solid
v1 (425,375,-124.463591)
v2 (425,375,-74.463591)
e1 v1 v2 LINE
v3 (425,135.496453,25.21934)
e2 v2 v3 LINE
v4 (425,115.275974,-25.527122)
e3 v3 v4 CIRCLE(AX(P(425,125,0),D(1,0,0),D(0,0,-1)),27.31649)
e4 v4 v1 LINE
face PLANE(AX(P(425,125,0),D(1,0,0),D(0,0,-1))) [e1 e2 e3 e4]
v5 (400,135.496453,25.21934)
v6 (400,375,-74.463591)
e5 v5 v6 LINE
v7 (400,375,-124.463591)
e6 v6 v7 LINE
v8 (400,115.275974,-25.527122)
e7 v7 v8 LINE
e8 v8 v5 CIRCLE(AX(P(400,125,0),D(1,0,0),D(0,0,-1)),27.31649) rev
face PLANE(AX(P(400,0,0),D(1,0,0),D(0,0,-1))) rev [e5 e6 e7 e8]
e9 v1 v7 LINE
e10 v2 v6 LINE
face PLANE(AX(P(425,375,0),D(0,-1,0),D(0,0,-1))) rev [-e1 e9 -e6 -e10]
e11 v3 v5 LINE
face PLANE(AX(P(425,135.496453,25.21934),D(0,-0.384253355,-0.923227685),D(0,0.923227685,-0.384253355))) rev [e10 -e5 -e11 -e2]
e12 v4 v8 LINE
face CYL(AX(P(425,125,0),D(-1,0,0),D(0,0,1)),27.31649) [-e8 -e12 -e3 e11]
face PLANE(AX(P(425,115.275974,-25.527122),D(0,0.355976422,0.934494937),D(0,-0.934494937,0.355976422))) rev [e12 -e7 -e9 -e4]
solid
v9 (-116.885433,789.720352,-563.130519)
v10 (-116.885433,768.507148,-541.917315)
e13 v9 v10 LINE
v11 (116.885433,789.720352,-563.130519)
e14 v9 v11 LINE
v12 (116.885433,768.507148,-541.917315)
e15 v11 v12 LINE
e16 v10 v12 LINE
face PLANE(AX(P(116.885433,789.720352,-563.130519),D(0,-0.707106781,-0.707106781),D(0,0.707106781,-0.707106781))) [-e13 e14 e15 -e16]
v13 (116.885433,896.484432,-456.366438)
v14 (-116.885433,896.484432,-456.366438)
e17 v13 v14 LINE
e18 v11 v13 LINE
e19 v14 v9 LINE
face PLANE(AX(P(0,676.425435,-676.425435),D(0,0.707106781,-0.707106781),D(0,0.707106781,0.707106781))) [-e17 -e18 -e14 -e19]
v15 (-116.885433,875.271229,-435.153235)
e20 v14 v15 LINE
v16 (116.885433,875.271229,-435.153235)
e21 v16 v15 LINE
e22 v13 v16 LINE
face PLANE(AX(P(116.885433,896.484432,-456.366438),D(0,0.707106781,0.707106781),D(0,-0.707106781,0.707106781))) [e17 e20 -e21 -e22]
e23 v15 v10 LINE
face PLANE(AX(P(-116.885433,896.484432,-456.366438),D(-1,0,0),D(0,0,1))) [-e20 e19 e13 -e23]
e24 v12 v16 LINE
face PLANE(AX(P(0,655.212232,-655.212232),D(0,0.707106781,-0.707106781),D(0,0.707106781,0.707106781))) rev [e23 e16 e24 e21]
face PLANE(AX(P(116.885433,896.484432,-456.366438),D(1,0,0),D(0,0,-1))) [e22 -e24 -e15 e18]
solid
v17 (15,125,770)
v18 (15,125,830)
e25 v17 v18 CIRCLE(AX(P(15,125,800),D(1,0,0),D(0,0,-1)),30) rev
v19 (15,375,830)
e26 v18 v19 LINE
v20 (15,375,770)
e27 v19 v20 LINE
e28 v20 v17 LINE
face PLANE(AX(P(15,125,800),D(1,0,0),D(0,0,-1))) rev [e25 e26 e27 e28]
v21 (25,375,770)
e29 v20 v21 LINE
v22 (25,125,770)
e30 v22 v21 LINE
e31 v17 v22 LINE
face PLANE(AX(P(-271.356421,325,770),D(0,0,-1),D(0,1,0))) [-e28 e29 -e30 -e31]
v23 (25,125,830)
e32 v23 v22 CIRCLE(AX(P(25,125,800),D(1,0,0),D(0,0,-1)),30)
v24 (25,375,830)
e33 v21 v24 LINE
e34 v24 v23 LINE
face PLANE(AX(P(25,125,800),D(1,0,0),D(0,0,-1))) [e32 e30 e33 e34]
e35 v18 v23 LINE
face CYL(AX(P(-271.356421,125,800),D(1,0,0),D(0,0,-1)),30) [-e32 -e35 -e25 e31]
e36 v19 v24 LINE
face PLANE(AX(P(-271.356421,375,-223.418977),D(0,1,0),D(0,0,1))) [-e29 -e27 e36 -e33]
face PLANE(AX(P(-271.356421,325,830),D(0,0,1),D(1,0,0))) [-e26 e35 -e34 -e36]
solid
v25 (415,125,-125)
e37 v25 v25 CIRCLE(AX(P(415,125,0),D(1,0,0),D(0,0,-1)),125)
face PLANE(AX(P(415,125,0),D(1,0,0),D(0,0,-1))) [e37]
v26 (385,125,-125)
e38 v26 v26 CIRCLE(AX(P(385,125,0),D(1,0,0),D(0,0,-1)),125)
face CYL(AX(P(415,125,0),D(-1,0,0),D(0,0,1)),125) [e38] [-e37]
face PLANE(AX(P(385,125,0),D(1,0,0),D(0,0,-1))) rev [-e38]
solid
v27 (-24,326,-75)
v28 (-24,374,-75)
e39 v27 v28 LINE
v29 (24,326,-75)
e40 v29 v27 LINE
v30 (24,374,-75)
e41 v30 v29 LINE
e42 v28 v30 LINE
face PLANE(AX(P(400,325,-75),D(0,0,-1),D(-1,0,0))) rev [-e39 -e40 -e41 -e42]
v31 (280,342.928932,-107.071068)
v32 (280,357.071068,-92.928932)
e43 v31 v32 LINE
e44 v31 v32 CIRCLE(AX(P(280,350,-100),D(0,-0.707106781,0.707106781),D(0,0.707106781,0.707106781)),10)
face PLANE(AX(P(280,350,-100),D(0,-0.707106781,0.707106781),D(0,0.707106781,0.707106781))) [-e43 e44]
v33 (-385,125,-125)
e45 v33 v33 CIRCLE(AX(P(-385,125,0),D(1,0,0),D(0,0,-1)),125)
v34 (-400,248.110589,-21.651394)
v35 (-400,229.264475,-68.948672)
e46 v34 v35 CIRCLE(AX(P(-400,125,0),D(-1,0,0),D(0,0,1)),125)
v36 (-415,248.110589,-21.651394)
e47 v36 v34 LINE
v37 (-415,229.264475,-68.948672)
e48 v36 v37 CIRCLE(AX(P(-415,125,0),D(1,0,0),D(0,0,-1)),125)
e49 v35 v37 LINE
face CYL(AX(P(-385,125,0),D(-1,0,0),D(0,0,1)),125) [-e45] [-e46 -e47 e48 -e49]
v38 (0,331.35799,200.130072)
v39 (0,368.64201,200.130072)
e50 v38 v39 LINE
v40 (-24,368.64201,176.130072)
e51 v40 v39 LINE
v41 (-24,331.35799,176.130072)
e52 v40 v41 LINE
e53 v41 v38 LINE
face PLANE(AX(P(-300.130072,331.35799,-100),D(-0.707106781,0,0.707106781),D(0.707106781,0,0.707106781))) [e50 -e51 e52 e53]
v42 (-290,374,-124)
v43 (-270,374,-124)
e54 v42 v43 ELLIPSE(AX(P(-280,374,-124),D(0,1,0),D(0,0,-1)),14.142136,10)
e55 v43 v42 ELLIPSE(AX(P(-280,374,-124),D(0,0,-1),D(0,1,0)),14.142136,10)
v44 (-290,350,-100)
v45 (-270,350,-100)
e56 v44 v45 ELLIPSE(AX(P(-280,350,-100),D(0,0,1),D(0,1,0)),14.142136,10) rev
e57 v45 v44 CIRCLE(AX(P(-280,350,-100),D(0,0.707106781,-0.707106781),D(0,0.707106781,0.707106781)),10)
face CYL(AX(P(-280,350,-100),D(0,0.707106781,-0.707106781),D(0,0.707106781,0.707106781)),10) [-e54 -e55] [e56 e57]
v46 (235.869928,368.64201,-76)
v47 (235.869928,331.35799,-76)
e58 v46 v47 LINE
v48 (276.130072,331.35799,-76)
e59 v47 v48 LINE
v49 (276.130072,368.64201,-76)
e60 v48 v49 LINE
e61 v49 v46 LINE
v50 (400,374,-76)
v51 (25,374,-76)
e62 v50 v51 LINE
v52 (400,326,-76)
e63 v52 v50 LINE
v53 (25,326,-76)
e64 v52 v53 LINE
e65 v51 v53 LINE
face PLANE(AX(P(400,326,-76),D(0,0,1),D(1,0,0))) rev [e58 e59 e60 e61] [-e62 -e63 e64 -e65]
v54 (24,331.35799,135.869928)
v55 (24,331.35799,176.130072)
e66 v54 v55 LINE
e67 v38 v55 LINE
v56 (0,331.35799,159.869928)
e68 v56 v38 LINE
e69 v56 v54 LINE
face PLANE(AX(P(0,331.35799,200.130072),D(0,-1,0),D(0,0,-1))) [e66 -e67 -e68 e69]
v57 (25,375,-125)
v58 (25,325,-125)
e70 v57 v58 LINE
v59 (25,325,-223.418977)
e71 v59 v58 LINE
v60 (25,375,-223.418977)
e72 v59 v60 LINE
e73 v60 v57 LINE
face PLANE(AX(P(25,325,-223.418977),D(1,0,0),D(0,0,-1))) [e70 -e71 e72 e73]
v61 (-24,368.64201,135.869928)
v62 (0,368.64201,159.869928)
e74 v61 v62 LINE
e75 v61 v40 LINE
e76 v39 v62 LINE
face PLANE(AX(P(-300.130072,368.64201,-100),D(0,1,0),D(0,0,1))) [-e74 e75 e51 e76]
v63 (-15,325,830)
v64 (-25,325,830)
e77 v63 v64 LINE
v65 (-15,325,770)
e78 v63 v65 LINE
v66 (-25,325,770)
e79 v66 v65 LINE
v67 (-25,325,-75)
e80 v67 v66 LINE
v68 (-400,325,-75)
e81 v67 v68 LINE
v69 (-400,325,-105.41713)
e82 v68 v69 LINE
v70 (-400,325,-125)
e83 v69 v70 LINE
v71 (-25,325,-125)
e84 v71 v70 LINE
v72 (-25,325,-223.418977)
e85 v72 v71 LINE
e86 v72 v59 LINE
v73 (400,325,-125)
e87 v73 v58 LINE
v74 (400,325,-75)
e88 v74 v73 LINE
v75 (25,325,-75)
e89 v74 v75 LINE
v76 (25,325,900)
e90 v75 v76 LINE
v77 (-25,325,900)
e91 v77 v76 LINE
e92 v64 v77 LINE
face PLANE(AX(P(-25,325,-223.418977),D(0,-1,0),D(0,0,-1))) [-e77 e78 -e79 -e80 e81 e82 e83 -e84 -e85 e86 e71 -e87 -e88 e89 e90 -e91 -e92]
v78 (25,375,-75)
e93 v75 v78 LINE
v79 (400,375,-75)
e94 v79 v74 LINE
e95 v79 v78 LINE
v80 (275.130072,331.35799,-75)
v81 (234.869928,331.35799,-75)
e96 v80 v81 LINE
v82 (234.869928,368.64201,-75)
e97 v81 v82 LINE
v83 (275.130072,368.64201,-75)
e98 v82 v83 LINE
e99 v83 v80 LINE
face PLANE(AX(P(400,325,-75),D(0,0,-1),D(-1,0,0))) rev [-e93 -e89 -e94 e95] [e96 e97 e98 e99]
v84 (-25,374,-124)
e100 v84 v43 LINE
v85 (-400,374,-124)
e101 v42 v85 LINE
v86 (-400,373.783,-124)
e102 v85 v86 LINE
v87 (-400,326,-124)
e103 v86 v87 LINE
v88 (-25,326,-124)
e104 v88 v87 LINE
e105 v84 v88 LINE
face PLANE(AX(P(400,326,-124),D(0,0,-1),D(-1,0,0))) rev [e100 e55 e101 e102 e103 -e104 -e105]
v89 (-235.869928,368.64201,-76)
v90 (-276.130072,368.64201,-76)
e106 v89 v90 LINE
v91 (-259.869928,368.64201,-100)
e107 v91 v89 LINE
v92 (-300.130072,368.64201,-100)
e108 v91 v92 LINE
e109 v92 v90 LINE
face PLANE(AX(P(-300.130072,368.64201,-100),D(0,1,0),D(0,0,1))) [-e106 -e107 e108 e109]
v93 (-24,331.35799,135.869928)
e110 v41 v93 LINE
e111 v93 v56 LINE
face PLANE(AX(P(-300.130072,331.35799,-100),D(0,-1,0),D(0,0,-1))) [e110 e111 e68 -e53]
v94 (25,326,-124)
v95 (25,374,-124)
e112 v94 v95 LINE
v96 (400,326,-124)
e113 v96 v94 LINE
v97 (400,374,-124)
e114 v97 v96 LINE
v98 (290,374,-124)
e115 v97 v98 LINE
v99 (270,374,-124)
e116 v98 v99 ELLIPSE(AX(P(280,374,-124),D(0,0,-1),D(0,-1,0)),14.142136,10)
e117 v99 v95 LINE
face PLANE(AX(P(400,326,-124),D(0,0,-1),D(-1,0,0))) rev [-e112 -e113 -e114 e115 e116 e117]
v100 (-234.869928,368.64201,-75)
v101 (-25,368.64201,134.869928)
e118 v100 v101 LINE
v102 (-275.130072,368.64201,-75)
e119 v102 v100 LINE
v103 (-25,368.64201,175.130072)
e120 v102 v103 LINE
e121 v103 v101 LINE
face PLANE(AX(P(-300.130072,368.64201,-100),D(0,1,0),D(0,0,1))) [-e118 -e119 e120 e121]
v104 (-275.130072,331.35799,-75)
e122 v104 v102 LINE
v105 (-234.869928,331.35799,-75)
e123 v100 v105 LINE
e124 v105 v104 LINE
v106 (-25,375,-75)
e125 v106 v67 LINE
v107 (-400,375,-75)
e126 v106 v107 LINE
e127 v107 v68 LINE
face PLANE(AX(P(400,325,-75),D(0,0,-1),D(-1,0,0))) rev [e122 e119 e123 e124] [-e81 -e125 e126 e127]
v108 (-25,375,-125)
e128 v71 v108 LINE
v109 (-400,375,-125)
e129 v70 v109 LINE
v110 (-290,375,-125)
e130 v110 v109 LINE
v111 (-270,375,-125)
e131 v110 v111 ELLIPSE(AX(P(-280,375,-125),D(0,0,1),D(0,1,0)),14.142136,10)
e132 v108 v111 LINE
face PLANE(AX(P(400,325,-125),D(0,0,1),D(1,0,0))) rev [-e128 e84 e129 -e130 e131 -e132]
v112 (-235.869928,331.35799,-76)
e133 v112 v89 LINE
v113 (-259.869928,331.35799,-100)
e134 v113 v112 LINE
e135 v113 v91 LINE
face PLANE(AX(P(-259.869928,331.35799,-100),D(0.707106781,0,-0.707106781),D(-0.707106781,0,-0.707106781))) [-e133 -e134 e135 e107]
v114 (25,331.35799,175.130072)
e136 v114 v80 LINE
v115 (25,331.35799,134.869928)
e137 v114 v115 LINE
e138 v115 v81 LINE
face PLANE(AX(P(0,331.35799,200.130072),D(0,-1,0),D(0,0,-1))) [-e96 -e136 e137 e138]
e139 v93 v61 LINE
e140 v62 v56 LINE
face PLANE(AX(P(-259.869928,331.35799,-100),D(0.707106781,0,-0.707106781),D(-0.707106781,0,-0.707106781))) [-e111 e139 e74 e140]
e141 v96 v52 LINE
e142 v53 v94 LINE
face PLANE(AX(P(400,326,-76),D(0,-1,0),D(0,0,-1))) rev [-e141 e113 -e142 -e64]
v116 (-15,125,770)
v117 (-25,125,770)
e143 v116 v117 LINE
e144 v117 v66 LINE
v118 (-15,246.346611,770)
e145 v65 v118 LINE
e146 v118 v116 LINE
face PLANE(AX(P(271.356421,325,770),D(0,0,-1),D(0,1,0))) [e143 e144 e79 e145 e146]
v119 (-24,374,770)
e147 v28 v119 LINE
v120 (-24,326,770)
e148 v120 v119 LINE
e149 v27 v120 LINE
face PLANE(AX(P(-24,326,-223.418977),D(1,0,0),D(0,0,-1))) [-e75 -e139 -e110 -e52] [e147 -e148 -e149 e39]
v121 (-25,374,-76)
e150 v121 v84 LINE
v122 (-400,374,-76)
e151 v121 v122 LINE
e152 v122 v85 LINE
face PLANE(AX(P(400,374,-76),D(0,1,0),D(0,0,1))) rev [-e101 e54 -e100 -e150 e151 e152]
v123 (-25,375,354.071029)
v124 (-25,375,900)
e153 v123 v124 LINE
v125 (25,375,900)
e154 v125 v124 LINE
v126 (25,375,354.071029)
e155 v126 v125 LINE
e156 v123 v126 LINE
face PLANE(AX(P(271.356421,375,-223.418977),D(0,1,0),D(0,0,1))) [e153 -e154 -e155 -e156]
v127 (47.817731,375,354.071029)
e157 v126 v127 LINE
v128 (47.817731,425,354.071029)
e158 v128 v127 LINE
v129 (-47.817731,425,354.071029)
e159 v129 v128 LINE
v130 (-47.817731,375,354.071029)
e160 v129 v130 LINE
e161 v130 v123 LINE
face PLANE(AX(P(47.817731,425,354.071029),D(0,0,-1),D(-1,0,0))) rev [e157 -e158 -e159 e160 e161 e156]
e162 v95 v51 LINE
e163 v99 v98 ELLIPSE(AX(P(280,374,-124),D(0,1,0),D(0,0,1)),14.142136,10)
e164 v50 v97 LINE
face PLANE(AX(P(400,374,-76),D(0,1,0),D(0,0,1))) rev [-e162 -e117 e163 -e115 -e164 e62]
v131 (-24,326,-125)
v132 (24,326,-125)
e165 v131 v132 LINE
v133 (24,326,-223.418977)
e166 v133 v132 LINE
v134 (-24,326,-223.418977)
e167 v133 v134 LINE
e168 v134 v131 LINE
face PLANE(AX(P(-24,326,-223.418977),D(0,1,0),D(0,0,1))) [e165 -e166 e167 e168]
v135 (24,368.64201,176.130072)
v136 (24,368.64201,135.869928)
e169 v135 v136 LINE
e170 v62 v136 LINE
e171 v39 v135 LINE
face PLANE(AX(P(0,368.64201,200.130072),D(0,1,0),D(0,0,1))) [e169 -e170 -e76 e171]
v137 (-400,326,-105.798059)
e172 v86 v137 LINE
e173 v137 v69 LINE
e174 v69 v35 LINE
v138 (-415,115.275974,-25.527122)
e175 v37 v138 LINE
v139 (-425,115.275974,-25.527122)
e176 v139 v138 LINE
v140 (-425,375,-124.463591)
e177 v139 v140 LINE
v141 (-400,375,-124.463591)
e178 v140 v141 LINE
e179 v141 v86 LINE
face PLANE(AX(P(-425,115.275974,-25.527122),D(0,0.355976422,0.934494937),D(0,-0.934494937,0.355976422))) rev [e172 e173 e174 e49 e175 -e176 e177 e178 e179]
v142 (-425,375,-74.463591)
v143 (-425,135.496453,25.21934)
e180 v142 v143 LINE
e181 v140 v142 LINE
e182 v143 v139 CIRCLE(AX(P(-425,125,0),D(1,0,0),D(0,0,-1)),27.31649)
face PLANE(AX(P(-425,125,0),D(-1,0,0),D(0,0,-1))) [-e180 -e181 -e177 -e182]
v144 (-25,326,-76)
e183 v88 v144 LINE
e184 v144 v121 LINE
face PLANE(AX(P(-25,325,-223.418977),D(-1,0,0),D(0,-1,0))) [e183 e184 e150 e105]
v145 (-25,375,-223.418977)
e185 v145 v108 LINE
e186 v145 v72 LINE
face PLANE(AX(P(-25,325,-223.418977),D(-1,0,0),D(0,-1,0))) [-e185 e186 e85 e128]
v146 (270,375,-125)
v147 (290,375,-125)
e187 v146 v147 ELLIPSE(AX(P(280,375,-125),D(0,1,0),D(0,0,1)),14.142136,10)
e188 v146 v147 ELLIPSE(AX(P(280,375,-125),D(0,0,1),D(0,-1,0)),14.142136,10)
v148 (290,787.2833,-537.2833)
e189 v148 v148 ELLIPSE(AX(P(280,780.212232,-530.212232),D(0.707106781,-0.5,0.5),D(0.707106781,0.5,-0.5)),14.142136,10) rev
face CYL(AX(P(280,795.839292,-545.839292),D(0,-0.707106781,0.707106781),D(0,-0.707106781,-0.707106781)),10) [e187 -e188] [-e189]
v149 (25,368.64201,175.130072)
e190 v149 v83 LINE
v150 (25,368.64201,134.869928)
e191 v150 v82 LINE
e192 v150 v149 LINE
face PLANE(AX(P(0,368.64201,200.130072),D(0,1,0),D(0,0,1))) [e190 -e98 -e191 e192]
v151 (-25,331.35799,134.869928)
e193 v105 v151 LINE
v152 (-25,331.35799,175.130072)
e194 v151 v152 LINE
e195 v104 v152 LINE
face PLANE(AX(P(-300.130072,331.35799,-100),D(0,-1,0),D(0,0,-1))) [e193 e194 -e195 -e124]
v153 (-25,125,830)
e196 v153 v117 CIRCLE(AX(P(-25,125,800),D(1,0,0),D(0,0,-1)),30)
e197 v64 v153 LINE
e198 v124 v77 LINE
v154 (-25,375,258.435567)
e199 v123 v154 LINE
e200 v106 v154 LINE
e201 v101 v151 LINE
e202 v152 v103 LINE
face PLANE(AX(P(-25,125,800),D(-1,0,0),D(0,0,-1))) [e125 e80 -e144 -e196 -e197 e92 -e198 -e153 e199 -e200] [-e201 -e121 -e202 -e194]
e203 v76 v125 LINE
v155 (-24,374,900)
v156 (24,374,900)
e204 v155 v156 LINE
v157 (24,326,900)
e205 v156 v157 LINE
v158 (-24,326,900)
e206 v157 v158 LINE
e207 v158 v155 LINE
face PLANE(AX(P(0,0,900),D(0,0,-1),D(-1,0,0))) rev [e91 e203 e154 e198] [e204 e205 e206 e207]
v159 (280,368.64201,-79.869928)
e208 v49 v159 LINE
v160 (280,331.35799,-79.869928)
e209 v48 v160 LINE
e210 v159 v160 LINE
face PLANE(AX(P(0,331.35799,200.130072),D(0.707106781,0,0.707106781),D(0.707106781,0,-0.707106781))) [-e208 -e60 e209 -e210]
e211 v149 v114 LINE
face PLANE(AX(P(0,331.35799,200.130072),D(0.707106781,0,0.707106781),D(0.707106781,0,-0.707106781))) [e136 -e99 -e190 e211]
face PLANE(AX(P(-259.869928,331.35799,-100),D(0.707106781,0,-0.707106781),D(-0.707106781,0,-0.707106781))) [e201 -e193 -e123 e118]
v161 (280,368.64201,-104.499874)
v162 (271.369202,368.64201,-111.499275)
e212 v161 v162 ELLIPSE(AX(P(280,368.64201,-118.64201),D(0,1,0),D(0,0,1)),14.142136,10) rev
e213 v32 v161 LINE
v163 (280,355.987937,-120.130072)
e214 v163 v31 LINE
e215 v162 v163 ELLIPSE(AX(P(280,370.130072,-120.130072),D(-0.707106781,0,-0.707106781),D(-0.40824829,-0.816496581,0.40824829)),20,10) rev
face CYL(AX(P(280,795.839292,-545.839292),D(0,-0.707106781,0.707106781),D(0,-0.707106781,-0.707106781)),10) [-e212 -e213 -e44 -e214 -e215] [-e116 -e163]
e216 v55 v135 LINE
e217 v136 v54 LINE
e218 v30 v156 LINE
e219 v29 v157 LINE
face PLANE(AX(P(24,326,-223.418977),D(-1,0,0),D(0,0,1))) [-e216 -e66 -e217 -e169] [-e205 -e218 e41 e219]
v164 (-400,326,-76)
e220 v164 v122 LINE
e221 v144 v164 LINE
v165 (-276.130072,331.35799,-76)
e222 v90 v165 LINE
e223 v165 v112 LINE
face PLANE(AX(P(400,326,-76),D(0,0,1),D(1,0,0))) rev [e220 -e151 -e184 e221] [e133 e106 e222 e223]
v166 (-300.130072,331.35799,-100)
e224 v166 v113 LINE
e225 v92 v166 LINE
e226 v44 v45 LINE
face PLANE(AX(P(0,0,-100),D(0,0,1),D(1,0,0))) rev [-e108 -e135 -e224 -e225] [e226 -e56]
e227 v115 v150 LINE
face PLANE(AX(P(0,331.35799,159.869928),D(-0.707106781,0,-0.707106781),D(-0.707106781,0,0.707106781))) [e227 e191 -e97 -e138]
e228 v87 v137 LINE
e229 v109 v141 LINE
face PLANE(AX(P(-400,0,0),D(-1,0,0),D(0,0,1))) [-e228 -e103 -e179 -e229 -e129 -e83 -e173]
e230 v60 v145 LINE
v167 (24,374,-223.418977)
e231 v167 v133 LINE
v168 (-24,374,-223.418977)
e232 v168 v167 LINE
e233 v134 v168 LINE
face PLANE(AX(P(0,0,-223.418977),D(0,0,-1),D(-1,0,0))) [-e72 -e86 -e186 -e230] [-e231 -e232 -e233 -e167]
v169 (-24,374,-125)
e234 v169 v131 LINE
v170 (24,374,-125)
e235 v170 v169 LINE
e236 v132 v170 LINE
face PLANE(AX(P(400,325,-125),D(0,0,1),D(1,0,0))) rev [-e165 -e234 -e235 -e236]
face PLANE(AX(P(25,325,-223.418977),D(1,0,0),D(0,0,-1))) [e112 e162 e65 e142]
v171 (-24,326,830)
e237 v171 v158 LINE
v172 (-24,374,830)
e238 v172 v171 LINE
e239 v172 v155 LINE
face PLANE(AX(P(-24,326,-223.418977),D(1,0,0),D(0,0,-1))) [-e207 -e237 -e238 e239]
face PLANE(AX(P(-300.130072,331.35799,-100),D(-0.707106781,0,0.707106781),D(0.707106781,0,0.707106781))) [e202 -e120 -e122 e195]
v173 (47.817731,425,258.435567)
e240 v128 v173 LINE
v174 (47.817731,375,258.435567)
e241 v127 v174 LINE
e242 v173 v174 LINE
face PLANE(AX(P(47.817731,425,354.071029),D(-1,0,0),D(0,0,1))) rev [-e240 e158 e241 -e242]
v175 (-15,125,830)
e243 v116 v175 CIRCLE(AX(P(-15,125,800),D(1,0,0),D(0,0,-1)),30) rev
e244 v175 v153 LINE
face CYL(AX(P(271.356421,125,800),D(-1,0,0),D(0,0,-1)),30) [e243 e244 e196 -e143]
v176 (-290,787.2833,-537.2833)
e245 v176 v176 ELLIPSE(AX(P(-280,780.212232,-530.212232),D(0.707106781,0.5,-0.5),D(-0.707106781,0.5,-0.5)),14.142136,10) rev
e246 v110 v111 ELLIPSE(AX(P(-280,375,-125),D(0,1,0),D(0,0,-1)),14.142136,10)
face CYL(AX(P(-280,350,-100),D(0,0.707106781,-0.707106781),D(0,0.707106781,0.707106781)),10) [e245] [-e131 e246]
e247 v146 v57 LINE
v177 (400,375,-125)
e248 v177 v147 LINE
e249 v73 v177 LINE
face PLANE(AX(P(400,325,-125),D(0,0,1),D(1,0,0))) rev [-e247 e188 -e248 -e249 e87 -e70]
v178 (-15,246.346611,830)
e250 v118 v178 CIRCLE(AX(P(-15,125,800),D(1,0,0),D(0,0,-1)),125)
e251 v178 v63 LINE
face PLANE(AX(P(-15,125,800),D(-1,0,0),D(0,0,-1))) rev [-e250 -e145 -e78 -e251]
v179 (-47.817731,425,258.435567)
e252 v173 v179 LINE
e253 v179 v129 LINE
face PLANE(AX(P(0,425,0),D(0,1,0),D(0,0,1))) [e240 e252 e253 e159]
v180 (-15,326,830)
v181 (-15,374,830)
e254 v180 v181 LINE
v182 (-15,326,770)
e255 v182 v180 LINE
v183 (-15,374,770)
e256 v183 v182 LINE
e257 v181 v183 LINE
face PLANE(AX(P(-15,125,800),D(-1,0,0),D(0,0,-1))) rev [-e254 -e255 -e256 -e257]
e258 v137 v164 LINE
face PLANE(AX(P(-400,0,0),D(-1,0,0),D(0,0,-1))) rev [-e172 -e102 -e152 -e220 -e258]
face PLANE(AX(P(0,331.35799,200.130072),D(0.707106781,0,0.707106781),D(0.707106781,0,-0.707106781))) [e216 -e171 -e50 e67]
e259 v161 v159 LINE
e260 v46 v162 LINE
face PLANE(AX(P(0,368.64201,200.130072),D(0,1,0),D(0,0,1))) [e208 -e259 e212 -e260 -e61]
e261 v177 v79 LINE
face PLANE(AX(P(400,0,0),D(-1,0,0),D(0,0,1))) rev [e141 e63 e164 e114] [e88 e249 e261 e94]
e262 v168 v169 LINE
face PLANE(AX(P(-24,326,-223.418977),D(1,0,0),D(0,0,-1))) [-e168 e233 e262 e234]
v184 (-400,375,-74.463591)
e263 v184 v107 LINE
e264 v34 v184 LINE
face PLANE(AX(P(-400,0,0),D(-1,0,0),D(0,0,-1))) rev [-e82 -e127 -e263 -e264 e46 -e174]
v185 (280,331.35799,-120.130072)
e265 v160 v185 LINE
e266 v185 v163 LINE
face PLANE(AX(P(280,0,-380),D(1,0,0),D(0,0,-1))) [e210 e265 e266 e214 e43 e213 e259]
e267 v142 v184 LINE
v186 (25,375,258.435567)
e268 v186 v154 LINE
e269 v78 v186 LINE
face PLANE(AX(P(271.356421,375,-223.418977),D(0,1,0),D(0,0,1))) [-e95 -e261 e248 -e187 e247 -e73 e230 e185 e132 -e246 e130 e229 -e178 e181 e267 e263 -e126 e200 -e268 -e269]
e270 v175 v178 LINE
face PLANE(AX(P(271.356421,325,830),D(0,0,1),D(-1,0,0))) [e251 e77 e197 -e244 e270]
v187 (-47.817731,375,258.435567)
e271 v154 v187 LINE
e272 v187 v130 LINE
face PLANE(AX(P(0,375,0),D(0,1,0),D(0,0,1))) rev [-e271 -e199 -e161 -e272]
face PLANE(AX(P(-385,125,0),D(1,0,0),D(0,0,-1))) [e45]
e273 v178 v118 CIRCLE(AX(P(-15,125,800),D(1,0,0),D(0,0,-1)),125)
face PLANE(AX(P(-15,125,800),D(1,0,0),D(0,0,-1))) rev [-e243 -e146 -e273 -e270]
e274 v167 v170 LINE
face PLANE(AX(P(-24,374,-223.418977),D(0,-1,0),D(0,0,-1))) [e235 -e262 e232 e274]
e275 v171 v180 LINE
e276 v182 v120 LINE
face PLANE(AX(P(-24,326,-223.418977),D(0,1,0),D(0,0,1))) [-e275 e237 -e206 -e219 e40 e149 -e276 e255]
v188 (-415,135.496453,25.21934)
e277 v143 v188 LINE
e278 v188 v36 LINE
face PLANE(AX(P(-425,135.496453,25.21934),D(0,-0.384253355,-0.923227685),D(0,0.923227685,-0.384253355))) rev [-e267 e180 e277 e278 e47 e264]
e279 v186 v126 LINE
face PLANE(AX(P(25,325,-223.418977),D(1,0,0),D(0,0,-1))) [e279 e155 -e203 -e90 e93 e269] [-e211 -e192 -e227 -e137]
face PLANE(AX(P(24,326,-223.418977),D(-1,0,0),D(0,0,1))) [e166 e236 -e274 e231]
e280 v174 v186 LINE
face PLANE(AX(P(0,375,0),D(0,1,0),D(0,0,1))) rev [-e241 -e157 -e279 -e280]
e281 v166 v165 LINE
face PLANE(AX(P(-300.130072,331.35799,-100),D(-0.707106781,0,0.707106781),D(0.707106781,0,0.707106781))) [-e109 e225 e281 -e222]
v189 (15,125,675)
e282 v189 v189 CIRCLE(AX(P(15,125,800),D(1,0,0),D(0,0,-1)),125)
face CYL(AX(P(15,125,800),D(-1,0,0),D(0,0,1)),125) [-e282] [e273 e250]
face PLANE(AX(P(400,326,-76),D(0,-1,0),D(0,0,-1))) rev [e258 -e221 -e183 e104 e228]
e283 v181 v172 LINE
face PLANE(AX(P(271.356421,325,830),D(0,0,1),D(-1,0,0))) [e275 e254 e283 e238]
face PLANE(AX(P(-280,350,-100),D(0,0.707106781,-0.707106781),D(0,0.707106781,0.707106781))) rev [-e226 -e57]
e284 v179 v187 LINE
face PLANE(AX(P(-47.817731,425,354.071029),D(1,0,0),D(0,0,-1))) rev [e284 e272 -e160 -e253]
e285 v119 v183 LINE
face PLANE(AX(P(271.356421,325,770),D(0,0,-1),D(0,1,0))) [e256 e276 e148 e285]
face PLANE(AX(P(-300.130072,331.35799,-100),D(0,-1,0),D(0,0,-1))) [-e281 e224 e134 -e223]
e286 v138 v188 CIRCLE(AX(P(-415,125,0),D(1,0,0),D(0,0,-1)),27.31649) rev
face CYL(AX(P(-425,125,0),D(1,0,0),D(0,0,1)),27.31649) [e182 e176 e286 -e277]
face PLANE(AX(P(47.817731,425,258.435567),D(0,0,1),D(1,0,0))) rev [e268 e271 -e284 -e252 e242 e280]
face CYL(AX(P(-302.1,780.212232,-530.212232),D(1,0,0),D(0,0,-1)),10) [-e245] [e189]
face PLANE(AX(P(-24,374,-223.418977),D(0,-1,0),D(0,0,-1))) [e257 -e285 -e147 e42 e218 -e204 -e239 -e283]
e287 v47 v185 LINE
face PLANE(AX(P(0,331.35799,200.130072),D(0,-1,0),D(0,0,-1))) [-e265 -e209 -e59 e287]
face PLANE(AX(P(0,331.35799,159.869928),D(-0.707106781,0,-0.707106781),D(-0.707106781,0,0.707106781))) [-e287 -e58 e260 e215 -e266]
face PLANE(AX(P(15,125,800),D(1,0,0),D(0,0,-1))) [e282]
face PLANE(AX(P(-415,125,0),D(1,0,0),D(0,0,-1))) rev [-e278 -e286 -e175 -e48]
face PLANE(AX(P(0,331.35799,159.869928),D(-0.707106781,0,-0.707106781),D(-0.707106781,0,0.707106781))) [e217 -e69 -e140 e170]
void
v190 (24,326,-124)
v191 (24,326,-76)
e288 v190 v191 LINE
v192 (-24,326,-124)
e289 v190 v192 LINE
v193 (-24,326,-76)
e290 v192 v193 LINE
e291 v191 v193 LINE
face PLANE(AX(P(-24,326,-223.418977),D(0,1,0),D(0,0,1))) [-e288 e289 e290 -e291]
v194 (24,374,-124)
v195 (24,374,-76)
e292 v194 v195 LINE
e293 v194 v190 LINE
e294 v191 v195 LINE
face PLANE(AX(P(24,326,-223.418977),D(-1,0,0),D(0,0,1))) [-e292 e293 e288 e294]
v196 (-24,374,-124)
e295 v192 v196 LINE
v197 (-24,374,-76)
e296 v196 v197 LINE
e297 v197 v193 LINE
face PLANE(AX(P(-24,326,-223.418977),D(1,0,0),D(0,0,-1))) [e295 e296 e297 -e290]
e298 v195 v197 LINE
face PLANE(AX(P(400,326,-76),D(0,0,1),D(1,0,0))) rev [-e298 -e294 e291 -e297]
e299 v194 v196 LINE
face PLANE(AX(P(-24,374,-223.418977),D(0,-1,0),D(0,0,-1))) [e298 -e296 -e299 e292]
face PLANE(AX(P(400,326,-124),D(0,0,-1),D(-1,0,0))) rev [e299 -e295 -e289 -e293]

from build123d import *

# Parameters (mm, degrees)
FWD_AFT_BEAM_XS_W         = 50
FWD_AFT_BEAM_XS_H         = 50
FWD_AFT_BEAM_XS_W_2       = 48
FWD_AFT_BEAM_XS_H_2       = 48
LAT_BEAM_XS_W             = 50
LAT_BEAM_XS_H             = 50
LAT_BEAM_XS_W_2           = 48
LAT_BEAM_XS_H_2           = 48
FRONT_WHEEL_SKETCH_R      = 125
BOSS_EXTRUDE1_DEPTH       = 15
REAR_RIGHT_WHEEL_SKETCH_R = 125
BOSS_EXTRUDE2_DEPTH       = 15
REAR_LEFT_WHEEL_SKETCH_R  = 125
BOSS_EXTRUDE3_DEPTH       = 15
SWEEP1_PROFILE_R          = 10
SKETCH14_W                = 40.260144978
SKETCH14_H                = 37.28401926
BOSS_EXTRUDE4_START       = 25
BOSS_EXTRUDE4_DEPTH       = 10
BOSS_EXTRUDE5_START       = 400
BOSS_EXTRUDE5_DEPTH       = 25
SKETCH17_W                = 233.770866628
SKETCH17_H                = 150.987210946
BOSS_EXTRUDE6_DEPTH       = 30
SKETCH20_W                = 95.63546101
SKETCH20_H                = 95.635461009
BOSS_EXTRUDE7_DEPTH       = 50


# Read off the part's stored shape, not the designer's step: Boss-Extrude5
with BuildPart() as part:
    # fwd-aft-beam: sweep along a path in fwd-aft-beam-profile
    with BuildLine(Plane(origin=(0, 350, -250), x_dir=(1, 0, 0), z_dir=(0, -1, 0))) as fwd_aft_beam_path:
        Line((0, 1150), (0, 26.58102252))
    # fwd-aft-beam-xs → fwd-aft-beam (sweep)
    with BuildSketch(Plane.XY):
        with Locations((0, 350)):
            Rectangle(FWD_AFT_BEAM_XS_W, FWD_AFT_BEAM_XS_H)
        with Locations((0, 350)):
            Rectangle(FWD_AFT_BEAM_XS_W_2, FWD_AFT_BEAM_XS_H_2, mode=Mode.SUBTRACT)
    sweep(path=fwd_aft_beam_path.line)

    # lat-beam: sweep along a path in lat-beam-profile
    with BuildLine(Plane(origin=(0, 350, 0), x_dir=(1, 0, 0), z_dir=(0, 1, 0))) as lat_beam_path:
        Line((-400, 100), (400, 100))
    # lat-beam-xs → lat-beam (sweep)
    with BuildSketch(Plane(origin=(0, 0, 0), x_dir=(0, 0, -1), z_dir=(1, 0, 0))):
        with Locations((100, 350)):
            Rectangle(LAT_BEAM_XS_W, LAT_BEAM_XS_H)
        with Locations((100, 350)):
            Rectangle(LAT_BEAM_XS_W_2, LAT_BEAM_XS_H_2, mode=Mode.SUBTRACT)
    sweep(path=lat_beam_path.line)

    # Sweep1: sweep along a path in Sketch1
    with BuildLine(Plane(origin=(0, 125, 125), x_dir=(1, 0, 0), z_dir=(0, 0.7071067811865488, 0.7071067811865464))) as sweep1_path:
        Line((-280, 318.198051534), (-280, 926.610024364))
        Line((-280, 926.610024364), (280, 926.610024364))
        Line((280, 926.610024364), (280, 318.198051534))
    # Sweep1 profile (on start of the path) → Sweep1 (sweep)
    with BuildSketch(Plane(origin=(-280, 350, -100), x_dir=(0, -0.7071067811865488, -0.7071067811865464), z_dir=(0, 0.7071067811865464, -0.7071067811865488))):
        Circle(SWEEP1_PROFILE_R)
    sweep(path=sweep1_path.line, transition=Transition.RIGHT)

    # Sweep2: sweep along a path in frame-sketch
    with BuildLine(Plane(origin=(0, 350, 0), x_dir=(1, 0, 0), z_dir=(0, 1, 0))) as sweep2_path:
        Line((280, 100), (0, -180))
        Line((0, -180), (-280, 100))
    # Sketch14 → Sweep2 (sweep)
    with BuildSketch(Plane.XY.offset(-100)):
        with Locations((-280, 350)):
            Rectangle(SKETCH14_W, SKETCH14_H)
    sweep(path=sweep2_path.line, transition=Transition.RIGHT)


with BuildPart() as body_2:
    # front-wheel-sketch → Boss-Extrude1 (new, symmetric)
    with BuildSketch(Plane(origin=(0, 0, 0), x_dir=(0, 0, -1), z_dir=(1, 0, 0))):
        with Locations((-800, 125)):
            Circle(FRONT_WHEEL_SKETCH_R)
    extrude(amount=BOSS_EXTRUDE1_DEPTH, both=True)


with BuildPart() as body_3:
    # rear-right-wheel-sketch → Boss-Extrude2 (new, symmetric)
    with BuildSketch(Plane(origin=(-400, 0, 0), x_dir=(0, 0, -1), z_dir=(1, 0, 0))):
        with Locations((0, 125)):
            Circle(REAR_RIGHT_WHEEL_SKETCH_R)
    extrude(amount=BOSS_EXTRUDE2_DEPTH, both=True)


with BuildPart() as body_4:
    # rear-left-wheel-sketch → Boss-Extrude3 (new, symmetric)
    with BuildSketch(Plane(origin=(400, 0, 0), x_dir=(0, 0, -1), z_dir=(1, 0, 0))):
        with Locations((0, 125)):
            Circle(REAR_LEFT_WHEEL_SKETCH_R)
    extrude(amount=BOSS_EXTRUDE3_DEPTH, both=True)


with BuildPart() as body_5:
    # Sketch16 → Boss-Extrude4 (new body)
    with BuildSketch(Plane(origin=(0, 0, 0), x_dir=(0, 0, -1), z_dir=(1, 0, 0)).offset(BOSS_EXTRUDE4_START)):
        with BuildLine():
            Line((-830, 375), (-770, 375))
            Line((-770, 375), (-770, 125))
            ThreePointArc((-770, 125), (-800, 95), (-830, 125))
            Line((-830, 125), (-830, 375))
        make_face()
    boss_extrude4 = extrude(amount=-BOSS_EXTRUDE4_DEPTH)


with BuildPart() as body_6:
    # Boss-Extrude5 outline → Boss-Extrude5 (new body)
    with BuildSketch(Plane(origin=(0, 0, 0), x_dir=(0, 0, -1), z_dir=(1, 0, 0)).offset(BOSS_EXTRUDE5_START)):
        with BuildLine():
            Line((74.463590991, 375), (-25.219339933, 135.496452983))
            ThreePointArc((-25.219339933, 135.496452983), (-10.111410838, 99.623830022), (25.527121699, 115.27597359))
            Line((25.527121699, 115.27597359), (124.463590991, 375))
            Line((124.463590991, 375), (74.463590991, 375))
        make_face()
    boss_extrude5 = extrude(amount=BOSS_EXTRUDE5_DEPTH)


with BuildPart() as body_7:
    # Sketch17 → Boss-Extrude6 (new body)
    with BuildSketch(Plane(origin=(0, 655.212231743, -655.212231743), x_dir=(1, 0, 0), z_dir=(0, -0.7071067811865488, 0.7071067811865464))):
        with Locations((0, 235.716812854)):
            Rectangle(SKETCH17_W, SKETCH17_H)
    extrude(amount=-BOSS_EXTRUDE6_DEPTH)


with BuildPart() as part_1:
    add(part.part)

    add(body_2.part)  # Mirror7 merges body 2

    add(body_3.part)  # Mirror7 merges body 3
    # Mirror7: Boss-Extrude4, Boss-Extrude5 across plane
    add(boss_extrude4.mirror(Plane(origin=(0, 0, 0), x_dir=(0, 0, 1), z_dir=(1, 0, 0))))
    add(boss_extrude5.mirror(Plane(origin=(0, 0, 0), x_dir=(0, 0, 1), z_dir=(1, 0, 0))))

    # Sketch20 → Boss-Extrude7 (add)
    with BuildSketch(Plane(origin=(0, 375, 0), x_dir=(1, 0, 0), z_dir=(0, 1, 0))):
        with Locations((0, -306.253298001)):
            Rectangle(SKETCH20_W, SKETCH20_H)
    extrude(amount=BOSS_EXTRUDE7_DEPTH)


solid = Compound([body_4.part, body_5.part, body_6.part, body_7.part, part_1.part])
